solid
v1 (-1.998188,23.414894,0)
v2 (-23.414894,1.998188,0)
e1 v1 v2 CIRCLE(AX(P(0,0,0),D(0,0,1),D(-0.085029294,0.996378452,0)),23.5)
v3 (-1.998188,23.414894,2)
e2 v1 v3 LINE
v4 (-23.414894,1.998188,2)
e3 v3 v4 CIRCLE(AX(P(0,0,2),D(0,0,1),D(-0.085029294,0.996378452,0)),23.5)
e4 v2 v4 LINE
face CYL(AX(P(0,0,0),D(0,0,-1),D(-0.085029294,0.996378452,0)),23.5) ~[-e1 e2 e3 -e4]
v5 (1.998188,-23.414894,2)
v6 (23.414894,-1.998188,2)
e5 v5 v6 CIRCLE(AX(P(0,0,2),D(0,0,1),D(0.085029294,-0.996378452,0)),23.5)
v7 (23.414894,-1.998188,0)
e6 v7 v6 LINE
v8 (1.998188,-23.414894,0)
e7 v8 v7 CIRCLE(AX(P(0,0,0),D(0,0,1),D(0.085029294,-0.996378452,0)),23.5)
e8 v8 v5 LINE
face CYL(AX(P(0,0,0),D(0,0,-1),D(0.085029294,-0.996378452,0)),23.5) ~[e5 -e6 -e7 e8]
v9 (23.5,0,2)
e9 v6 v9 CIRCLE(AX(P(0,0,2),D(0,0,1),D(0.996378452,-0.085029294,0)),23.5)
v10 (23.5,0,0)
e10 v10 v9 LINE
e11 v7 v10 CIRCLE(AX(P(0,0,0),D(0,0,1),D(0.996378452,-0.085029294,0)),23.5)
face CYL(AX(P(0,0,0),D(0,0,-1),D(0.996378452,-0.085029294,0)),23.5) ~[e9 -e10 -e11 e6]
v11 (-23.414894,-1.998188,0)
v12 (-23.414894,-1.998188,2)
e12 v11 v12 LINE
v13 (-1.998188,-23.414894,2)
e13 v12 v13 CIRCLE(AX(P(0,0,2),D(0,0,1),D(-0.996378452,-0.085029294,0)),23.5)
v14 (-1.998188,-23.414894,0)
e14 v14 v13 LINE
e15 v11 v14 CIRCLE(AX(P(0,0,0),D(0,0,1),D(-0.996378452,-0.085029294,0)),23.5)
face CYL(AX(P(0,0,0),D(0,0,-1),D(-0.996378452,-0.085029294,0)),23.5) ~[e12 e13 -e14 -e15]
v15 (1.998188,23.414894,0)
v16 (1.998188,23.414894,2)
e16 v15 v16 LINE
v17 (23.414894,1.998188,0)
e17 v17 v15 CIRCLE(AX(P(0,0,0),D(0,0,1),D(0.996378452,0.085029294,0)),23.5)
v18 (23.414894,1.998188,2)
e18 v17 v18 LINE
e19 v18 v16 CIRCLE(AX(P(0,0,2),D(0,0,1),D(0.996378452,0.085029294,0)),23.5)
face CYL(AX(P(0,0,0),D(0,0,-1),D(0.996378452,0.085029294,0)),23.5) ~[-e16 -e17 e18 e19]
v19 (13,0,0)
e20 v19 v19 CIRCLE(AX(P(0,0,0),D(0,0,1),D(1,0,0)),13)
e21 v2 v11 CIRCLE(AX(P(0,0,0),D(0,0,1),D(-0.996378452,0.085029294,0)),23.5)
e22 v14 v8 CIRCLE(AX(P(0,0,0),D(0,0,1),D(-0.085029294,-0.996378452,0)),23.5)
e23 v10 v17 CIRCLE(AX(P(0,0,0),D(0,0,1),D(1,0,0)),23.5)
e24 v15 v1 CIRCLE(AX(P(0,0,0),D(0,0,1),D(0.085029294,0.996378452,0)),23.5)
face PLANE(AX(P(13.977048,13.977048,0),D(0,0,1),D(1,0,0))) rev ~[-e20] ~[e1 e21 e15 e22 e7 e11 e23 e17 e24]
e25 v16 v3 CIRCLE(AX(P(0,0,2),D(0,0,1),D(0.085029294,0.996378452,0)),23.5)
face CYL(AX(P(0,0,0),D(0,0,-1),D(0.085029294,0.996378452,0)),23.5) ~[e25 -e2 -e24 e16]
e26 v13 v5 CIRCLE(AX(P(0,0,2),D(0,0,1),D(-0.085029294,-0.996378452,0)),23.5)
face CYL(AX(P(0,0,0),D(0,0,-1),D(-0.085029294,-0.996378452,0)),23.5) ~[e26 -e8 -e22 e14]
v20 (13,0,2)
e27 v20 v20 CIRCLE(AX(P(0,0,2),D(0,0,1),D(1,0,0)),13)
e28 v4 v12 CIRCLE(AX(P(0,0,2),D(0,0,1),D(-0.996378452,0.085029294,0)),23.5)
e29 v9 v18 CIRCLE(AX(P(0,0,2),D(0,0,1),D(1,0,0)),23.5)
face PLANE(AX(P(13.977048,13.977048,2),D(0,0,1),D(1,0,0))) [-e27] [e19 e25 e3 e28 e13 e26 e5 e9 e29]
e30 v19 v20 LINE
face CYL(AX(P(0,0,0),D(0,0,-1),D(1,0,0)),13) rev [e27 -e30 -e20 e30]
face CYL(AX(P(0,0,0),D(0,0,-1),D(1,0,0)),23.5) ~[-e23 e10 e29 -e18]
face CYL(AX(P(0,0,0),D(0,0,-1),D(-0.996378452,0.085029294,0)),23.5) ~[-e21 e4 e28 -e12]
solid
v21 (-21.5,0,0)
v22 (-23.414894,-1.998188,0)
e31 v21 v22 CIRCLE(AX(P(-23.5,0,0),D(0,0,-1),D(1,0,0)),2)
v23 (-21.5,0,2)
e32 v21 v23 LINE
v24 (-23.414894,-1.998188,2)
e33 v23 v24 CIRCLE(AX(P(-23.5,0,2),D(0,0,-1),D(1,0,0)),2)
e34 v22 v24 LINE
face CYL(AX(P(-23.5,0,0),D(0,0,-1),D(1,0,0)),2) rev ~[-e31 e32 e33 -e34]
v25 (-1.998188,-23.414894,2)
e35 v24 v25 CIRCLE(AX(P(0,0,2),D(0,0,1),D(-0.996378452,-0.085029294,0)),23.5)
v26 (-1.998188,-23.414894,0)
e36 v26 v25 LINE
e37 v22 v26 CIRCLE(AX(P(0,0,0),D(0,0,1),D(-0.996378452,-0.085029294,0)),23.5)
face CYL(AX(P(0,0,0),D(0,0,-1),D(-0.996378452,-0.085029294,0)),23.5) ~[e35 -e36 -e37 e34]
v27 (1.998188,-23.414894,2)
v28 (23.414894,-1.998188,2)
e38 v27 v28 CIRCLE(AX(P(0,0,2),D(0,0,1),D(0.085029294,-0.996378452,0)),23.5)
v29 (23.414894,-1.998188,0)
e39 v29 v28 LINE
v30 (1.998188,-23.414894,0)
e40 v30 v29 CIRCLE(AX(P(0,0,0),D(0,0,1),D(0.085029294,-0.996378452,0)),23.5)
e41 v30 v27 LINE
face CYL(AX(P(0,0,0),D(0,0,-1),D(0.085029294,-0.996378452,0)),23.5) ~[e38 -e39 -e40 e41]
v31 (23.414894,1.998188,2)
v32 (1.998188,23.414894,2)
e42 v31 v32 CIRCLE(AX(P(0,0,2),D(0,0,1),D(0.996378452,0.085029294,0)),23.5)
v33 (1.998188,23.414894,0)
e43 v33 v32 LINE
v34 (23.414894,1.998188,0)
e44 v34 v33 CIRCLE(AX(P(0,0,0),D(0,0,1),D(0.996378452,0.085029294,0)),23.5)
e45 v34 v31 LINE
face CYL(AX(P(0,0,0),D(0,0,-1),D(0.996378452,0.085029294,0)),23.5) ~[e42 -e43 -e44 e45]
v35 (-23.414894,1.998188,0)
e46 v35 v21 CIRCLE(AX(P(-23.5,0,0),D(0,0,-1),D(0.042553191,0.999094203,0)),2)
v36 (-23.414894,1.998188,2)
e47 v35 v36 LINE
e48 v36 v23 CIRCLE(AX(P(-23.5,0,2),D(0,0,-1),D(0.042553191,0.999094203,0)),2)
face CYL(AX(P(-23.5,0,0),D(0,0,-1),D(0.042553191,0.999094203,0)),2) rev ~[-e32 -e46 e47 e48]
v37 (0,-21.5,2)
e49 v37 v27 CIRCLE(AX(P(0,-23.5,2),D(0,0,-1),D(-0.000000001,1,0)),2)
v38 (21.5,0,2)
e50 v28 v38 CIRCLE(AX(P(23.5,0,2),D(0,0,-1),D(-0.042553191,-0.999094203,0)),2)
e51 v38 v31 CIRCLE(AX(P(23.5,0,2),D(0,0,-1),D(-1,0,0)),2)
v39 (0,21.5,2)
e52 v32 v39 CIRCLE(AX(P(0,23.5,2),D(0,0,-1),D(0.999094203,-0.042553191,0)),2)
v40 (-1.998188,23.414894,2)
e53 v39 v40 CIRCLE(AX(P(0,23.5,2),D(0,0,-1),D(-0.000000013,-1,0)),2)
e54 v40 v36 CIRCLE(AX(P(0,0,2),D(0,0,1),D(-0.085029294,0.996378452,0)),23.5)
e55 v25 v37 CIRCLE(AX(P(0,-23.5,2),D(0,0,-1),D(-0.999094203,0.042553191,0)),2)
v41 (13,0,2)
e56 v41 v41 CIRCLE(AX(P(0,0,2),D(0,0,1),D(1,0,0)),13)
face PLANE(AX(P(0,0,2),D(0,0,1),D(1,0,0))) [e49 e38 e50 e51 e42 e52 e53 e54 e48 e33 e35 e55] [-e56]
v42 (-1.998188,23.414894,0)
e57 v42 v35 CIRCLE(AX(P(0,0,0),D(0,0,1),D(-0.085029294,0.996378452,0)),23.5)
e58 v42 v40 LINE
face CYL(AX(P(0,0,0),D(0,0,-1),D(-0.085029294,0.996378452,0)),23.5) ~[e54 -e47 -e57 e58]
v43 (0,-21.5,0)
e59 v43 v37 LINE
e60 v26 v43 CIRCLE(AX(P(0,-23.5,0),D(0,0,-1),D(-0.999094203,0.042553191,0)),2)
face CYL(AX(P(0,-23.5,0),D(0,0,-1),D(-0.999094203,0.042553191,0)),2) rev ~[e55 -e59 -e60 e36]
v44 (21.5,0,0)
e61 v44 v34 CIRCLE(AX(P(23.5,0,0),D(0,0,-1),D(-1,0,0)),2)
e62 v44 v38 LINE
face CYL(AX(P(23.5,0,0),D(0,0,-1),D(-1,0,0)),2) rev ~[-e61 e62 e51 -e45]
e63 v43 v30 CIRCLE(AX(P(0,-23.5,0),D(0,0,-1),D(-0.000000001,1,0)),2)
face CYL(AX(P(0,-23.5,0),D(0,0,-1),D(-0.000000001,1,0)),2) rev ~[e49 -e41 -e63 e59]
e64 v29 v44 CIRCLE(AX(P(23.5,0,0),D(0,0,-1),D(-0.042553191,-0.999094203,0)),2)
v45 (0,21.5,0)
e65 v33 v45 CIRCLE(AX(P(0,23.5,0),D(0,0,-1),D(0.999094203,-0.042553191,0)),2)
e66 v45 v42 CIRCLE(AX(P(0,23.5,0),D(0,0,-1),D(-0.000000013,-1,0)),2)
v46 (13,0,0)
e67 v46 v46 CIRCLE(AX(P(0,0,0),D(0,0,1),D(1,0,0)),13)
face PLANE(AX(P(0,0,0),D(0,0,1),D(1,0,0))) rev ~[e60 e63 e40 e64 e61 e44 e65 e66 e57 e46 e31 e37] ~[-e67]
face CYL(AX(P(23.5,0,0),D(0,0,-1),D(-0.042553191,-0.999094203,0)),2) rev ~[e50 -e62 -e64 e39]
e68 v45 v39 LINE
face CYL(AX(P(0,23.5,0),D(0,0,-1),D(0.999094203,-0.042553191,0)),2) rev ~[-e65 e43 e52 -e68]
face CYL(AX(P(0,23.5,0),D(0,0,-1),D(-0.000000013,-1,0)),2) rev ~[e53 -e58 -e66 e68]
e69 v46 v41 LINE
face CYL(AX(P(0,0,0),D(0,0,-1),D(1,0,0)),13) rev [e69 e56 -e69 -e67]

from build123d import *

# Parameters (mm, degrees)
F0_R     = 13
F1_DEPTH = 2
F2_DEPTH = 2


# Not quite as in the source:
# - a feature names something its author has since deleted; it is built from what else it names


with BuildPart() as f1:
    # F0 (on Top) → F1 (new body)
    with BuildSketch(Plane.XY):
        with BuildLine():
            ThreePointArc((21.5, 0), (22.0560102552, 1.383796812), (23.414893617, 1.9981884054))
            ThreePointArc((23.414893617, 1.9981884054), (16.6170093579, 16.6170093579), (1.9981884054, 23.414893617))
            ThreePointArc((1.9981884054, 23.414893617), (1.3837968027, 22.0560102463), (-2.58e-08, 21.5))
            ThreePointArc((-2.58e-08, 21.5), (15.2027957864, 15.2027958046), (21.5, 0))
        make_face()
        with BuildLine():
            ThreePointArc((-2.58e-08, 21.5), (1.3837968027, 22.0560102463), (1.9981884054, 23.414893617))
            ThreePointArc((1.9981884054, 23.414893617), (0, 23.5), (-1.9981884054, 23.414893617))
            ThreePointArc((-1.9981884054, 23.414893617), (-1.3837968214, 22.0560102642), (-2.58e-08, 21.5))
        make_face()
        with BuildLine():
            ThreePointArc((-2.58e-08, 21.5), (-1.3837968214, 22.0560102642), (-1.9981884054, 23.414893617))
            ThreePointArc((-1.9981884054, 23.414893617), (-16.6170093579, 16.6170093579), (-23.414893617, 1.9981884054))
            ThreePointArc((-23.414893617, 1.9981884054), (-22.0560102552, 1.383796812), (-21.5, 0))
            ThreePointArc((-21.5, 0), (-15.2027958046, 15.2027957864), (-2.58e-08, 21.5))
        make_face()
        with BuildLine():
            ThreePointArc((-21.5, 0), (-22.0560102552, 1.383796812), (-23.414893617, 1.9981884054))
            ThreePointArc((-23.414893617, 1.9981884054), (-23.5, 0), (-23.414893617, -1.9981884054))
            ThreePointArc((-23.414893617, -1.9981884054), (-22.0560102552, -1.383796812), (-21.5, 0))
        make_face()
        with BuildLine():
            ThreePointArc((-1.9981884054, -23.414893617), (-1.3837968124, -22.0560102556), (-1.1e-09, -21.5))
            ThreePointArc((-1.1e-09, -21.5), (-15.2027957959, -15.2027957951), (-21.5, 0))
            ThreePointArc((-21.5, 0), (-22.0560102552, -1.383796812), (-23.414893617, -1.9981884054))
            ThreePointArc((-23.414893617, -1.9981884054), (-16.6170093579, -16.6170093579), (-1.9981884054, -23.414893617))
        make_face()
        with BuildLine():
            ThreePointArc((-1.9981884054, -23.414893617), (0, -23.5), (1.9981884054, -23.414893617))
            ThreePointArc((1.9981884054, -23.414893617), (1.3837968117, -22.0560102549), (-1.1e-09, -21.5))
            ThreePointArc((-1.1e-09, -21.5), (-1.3837968124, -22.0560102556), (-1.9981884054, -23.414893617))
        make_face()
        with BuildLine():
            ThreePointArc((1.9981884054, -23.414893617), (16.6170093579, -16.6170093579), (23.414893617, -1.9981884054))
            ThreePointArc((23.414893617, -1.9981884054), (22.0560102552, -1.383796812), (21.5, 0))
            ThreePointArc((21.5, 0), (15.2027957951, -15.2027957959), (-1.1e-09, -21.5))
            ThreePointArc((-1.1e-09, -21.5), (1.3837968117, -22.0560102549), (1.9981884054, -23.414893617))
        make_face()
        with BuildLine():
            ThreePointArc((23.414893617, -1.9981884054), (23.4787137637, -1), (23.5, 0))
            ThreePointArc((23.5, 0), (23.4787137637, 1), (23.414893617, 1.9981884054))
            ThreePointArc((23.414893617, 1.9981884054), (22.0560102552, 1.383796812), (21.5, 0))
            ThreePointArc((21.5, 0), (22.0560102552, -1.383796812), (23.414893617, -1.9981884054))
        make_face()
        with BuildLine():
            ThreePointArc((-1.1e-09, -21.5), (15.2027957951, -15.2027957959), (21.5, 0))
            ThreePointArc((21.5, 0), (15.2027957864, 15.2027958046), (-2.58e-08, 21.5))
            ThreePointArc((-2.58e-08, 21.5), (-15.2027958046, 15.2027957864), (-21.5, 0))
            ThreePointArc((-21.5, 0), (-15.2027957959, -15.2027957951), (-1.1e-09, -21.5))
        make_face()
        Circle(F0_R, mode=Mode.SUBTRACT)
    extrude(amount=F1_DEPTH)


with BuildPart() as f2:
    # F0 (on Top) → F2 (new body)
    with BuildSketch(Plane.XY):
        with BuildLine():
            ThreePointArc((-1.1e-09, -21.5), (15.2027957951, -15.2027957959), (21.5, 0))
            ThreePointArc((21.5, 0), (15.2027957864, 15.2027958046), (-2.58e-08, 21.5))
            ThreePointArc((-2.58e-08, 21.5), (-15.2027958046, 15.2027957864), (-21.5, 0))
            ThreePointArc((-21.5, 0), (-15.2027957959, -15.2027957951), (-1.1e-09, -21.5))
        make_face()
        Circle(F0_R, mode=Mode.SUBTRACT)
        with BuildLine():
            ThreePointArc((-1.9981884054, -23.414893617), (-1.3837968124, -22.0560102556), (-1.1e-09, -21.5))
            ThreePointArc((-1.1e-09, -21.5), (-15.2027957959, -15.2027957951), (-21.5, 0))
            ThreePointArc((-21.5, 0), (-22.0560102552, -1.383796812), (-23.414893617, -1.9981884054))
            ThreePointArc((-23.414893617, -1.9981884054), (-16.6170093579, -16.6170093579), (-1.9981884054, -23.414893617))
        make_face()
        with BuildLine():
            ThreePointArc((-2.58e-08, 21.5), (-1.3837968214, 22.0560102642), (-1.9981884054, 23.414893617))
            ThreePointArc((-1.9981884054, 23.414893617), (-16.6170093579, 16.6170093579), (-23.414893617, 1.9981884054))
            ThreePointArc((-23.414893617, 1.9981884054), (-22.0560102552, 1.383796812), (-21.5, 0))
            ThreePointArc((-21.5, 0), (-15.2027958046, 15.2027957864), (-2.58e-08, 21.5))
        make_face()
        with BuildLine():
            ThreePointArc((1.9981884054, -23.414893617), (16.6170093579, -16.6170093579), (23.414893617, -1.9981884054))
            ThreePointArc((23.414893617, -1.9981884054), (22.0560102552, -1.383796812), (21.5, 0))
            ThreePointArc((21.5, 0), (15.2027957951, -15.2027957959), (-1.1e-09, -21.5))
            ThreePointArc((-1.1e-09, -21.5), (1.3837968117, -22.0560102549), (1.9981884054, -23.414893617))
        make_face()
        with BuildLine():
            ThreePointArc((21.5, 0), (22.0560102552, 1.383796812), (23.414893617, 1.9981884054))
            ThreePointArc((23.414893617, 1.9981884054), (16.6170093579, 16.6170093579), (1.9981884054, 23.414893617))
            ThreePointArc((1.9981884054, 23.414893617), (1.3837968027, 22.0560102463), (-2.58e-08, 21.5))
            ThreePointArc((-2.58e-08, 21.5), (15.2027957864, 15.2027958046), (21.5, 0))
        make_face()
    extrude(amount=F2_DEPTH)


solid = Compound([f1.part, f2.part])
